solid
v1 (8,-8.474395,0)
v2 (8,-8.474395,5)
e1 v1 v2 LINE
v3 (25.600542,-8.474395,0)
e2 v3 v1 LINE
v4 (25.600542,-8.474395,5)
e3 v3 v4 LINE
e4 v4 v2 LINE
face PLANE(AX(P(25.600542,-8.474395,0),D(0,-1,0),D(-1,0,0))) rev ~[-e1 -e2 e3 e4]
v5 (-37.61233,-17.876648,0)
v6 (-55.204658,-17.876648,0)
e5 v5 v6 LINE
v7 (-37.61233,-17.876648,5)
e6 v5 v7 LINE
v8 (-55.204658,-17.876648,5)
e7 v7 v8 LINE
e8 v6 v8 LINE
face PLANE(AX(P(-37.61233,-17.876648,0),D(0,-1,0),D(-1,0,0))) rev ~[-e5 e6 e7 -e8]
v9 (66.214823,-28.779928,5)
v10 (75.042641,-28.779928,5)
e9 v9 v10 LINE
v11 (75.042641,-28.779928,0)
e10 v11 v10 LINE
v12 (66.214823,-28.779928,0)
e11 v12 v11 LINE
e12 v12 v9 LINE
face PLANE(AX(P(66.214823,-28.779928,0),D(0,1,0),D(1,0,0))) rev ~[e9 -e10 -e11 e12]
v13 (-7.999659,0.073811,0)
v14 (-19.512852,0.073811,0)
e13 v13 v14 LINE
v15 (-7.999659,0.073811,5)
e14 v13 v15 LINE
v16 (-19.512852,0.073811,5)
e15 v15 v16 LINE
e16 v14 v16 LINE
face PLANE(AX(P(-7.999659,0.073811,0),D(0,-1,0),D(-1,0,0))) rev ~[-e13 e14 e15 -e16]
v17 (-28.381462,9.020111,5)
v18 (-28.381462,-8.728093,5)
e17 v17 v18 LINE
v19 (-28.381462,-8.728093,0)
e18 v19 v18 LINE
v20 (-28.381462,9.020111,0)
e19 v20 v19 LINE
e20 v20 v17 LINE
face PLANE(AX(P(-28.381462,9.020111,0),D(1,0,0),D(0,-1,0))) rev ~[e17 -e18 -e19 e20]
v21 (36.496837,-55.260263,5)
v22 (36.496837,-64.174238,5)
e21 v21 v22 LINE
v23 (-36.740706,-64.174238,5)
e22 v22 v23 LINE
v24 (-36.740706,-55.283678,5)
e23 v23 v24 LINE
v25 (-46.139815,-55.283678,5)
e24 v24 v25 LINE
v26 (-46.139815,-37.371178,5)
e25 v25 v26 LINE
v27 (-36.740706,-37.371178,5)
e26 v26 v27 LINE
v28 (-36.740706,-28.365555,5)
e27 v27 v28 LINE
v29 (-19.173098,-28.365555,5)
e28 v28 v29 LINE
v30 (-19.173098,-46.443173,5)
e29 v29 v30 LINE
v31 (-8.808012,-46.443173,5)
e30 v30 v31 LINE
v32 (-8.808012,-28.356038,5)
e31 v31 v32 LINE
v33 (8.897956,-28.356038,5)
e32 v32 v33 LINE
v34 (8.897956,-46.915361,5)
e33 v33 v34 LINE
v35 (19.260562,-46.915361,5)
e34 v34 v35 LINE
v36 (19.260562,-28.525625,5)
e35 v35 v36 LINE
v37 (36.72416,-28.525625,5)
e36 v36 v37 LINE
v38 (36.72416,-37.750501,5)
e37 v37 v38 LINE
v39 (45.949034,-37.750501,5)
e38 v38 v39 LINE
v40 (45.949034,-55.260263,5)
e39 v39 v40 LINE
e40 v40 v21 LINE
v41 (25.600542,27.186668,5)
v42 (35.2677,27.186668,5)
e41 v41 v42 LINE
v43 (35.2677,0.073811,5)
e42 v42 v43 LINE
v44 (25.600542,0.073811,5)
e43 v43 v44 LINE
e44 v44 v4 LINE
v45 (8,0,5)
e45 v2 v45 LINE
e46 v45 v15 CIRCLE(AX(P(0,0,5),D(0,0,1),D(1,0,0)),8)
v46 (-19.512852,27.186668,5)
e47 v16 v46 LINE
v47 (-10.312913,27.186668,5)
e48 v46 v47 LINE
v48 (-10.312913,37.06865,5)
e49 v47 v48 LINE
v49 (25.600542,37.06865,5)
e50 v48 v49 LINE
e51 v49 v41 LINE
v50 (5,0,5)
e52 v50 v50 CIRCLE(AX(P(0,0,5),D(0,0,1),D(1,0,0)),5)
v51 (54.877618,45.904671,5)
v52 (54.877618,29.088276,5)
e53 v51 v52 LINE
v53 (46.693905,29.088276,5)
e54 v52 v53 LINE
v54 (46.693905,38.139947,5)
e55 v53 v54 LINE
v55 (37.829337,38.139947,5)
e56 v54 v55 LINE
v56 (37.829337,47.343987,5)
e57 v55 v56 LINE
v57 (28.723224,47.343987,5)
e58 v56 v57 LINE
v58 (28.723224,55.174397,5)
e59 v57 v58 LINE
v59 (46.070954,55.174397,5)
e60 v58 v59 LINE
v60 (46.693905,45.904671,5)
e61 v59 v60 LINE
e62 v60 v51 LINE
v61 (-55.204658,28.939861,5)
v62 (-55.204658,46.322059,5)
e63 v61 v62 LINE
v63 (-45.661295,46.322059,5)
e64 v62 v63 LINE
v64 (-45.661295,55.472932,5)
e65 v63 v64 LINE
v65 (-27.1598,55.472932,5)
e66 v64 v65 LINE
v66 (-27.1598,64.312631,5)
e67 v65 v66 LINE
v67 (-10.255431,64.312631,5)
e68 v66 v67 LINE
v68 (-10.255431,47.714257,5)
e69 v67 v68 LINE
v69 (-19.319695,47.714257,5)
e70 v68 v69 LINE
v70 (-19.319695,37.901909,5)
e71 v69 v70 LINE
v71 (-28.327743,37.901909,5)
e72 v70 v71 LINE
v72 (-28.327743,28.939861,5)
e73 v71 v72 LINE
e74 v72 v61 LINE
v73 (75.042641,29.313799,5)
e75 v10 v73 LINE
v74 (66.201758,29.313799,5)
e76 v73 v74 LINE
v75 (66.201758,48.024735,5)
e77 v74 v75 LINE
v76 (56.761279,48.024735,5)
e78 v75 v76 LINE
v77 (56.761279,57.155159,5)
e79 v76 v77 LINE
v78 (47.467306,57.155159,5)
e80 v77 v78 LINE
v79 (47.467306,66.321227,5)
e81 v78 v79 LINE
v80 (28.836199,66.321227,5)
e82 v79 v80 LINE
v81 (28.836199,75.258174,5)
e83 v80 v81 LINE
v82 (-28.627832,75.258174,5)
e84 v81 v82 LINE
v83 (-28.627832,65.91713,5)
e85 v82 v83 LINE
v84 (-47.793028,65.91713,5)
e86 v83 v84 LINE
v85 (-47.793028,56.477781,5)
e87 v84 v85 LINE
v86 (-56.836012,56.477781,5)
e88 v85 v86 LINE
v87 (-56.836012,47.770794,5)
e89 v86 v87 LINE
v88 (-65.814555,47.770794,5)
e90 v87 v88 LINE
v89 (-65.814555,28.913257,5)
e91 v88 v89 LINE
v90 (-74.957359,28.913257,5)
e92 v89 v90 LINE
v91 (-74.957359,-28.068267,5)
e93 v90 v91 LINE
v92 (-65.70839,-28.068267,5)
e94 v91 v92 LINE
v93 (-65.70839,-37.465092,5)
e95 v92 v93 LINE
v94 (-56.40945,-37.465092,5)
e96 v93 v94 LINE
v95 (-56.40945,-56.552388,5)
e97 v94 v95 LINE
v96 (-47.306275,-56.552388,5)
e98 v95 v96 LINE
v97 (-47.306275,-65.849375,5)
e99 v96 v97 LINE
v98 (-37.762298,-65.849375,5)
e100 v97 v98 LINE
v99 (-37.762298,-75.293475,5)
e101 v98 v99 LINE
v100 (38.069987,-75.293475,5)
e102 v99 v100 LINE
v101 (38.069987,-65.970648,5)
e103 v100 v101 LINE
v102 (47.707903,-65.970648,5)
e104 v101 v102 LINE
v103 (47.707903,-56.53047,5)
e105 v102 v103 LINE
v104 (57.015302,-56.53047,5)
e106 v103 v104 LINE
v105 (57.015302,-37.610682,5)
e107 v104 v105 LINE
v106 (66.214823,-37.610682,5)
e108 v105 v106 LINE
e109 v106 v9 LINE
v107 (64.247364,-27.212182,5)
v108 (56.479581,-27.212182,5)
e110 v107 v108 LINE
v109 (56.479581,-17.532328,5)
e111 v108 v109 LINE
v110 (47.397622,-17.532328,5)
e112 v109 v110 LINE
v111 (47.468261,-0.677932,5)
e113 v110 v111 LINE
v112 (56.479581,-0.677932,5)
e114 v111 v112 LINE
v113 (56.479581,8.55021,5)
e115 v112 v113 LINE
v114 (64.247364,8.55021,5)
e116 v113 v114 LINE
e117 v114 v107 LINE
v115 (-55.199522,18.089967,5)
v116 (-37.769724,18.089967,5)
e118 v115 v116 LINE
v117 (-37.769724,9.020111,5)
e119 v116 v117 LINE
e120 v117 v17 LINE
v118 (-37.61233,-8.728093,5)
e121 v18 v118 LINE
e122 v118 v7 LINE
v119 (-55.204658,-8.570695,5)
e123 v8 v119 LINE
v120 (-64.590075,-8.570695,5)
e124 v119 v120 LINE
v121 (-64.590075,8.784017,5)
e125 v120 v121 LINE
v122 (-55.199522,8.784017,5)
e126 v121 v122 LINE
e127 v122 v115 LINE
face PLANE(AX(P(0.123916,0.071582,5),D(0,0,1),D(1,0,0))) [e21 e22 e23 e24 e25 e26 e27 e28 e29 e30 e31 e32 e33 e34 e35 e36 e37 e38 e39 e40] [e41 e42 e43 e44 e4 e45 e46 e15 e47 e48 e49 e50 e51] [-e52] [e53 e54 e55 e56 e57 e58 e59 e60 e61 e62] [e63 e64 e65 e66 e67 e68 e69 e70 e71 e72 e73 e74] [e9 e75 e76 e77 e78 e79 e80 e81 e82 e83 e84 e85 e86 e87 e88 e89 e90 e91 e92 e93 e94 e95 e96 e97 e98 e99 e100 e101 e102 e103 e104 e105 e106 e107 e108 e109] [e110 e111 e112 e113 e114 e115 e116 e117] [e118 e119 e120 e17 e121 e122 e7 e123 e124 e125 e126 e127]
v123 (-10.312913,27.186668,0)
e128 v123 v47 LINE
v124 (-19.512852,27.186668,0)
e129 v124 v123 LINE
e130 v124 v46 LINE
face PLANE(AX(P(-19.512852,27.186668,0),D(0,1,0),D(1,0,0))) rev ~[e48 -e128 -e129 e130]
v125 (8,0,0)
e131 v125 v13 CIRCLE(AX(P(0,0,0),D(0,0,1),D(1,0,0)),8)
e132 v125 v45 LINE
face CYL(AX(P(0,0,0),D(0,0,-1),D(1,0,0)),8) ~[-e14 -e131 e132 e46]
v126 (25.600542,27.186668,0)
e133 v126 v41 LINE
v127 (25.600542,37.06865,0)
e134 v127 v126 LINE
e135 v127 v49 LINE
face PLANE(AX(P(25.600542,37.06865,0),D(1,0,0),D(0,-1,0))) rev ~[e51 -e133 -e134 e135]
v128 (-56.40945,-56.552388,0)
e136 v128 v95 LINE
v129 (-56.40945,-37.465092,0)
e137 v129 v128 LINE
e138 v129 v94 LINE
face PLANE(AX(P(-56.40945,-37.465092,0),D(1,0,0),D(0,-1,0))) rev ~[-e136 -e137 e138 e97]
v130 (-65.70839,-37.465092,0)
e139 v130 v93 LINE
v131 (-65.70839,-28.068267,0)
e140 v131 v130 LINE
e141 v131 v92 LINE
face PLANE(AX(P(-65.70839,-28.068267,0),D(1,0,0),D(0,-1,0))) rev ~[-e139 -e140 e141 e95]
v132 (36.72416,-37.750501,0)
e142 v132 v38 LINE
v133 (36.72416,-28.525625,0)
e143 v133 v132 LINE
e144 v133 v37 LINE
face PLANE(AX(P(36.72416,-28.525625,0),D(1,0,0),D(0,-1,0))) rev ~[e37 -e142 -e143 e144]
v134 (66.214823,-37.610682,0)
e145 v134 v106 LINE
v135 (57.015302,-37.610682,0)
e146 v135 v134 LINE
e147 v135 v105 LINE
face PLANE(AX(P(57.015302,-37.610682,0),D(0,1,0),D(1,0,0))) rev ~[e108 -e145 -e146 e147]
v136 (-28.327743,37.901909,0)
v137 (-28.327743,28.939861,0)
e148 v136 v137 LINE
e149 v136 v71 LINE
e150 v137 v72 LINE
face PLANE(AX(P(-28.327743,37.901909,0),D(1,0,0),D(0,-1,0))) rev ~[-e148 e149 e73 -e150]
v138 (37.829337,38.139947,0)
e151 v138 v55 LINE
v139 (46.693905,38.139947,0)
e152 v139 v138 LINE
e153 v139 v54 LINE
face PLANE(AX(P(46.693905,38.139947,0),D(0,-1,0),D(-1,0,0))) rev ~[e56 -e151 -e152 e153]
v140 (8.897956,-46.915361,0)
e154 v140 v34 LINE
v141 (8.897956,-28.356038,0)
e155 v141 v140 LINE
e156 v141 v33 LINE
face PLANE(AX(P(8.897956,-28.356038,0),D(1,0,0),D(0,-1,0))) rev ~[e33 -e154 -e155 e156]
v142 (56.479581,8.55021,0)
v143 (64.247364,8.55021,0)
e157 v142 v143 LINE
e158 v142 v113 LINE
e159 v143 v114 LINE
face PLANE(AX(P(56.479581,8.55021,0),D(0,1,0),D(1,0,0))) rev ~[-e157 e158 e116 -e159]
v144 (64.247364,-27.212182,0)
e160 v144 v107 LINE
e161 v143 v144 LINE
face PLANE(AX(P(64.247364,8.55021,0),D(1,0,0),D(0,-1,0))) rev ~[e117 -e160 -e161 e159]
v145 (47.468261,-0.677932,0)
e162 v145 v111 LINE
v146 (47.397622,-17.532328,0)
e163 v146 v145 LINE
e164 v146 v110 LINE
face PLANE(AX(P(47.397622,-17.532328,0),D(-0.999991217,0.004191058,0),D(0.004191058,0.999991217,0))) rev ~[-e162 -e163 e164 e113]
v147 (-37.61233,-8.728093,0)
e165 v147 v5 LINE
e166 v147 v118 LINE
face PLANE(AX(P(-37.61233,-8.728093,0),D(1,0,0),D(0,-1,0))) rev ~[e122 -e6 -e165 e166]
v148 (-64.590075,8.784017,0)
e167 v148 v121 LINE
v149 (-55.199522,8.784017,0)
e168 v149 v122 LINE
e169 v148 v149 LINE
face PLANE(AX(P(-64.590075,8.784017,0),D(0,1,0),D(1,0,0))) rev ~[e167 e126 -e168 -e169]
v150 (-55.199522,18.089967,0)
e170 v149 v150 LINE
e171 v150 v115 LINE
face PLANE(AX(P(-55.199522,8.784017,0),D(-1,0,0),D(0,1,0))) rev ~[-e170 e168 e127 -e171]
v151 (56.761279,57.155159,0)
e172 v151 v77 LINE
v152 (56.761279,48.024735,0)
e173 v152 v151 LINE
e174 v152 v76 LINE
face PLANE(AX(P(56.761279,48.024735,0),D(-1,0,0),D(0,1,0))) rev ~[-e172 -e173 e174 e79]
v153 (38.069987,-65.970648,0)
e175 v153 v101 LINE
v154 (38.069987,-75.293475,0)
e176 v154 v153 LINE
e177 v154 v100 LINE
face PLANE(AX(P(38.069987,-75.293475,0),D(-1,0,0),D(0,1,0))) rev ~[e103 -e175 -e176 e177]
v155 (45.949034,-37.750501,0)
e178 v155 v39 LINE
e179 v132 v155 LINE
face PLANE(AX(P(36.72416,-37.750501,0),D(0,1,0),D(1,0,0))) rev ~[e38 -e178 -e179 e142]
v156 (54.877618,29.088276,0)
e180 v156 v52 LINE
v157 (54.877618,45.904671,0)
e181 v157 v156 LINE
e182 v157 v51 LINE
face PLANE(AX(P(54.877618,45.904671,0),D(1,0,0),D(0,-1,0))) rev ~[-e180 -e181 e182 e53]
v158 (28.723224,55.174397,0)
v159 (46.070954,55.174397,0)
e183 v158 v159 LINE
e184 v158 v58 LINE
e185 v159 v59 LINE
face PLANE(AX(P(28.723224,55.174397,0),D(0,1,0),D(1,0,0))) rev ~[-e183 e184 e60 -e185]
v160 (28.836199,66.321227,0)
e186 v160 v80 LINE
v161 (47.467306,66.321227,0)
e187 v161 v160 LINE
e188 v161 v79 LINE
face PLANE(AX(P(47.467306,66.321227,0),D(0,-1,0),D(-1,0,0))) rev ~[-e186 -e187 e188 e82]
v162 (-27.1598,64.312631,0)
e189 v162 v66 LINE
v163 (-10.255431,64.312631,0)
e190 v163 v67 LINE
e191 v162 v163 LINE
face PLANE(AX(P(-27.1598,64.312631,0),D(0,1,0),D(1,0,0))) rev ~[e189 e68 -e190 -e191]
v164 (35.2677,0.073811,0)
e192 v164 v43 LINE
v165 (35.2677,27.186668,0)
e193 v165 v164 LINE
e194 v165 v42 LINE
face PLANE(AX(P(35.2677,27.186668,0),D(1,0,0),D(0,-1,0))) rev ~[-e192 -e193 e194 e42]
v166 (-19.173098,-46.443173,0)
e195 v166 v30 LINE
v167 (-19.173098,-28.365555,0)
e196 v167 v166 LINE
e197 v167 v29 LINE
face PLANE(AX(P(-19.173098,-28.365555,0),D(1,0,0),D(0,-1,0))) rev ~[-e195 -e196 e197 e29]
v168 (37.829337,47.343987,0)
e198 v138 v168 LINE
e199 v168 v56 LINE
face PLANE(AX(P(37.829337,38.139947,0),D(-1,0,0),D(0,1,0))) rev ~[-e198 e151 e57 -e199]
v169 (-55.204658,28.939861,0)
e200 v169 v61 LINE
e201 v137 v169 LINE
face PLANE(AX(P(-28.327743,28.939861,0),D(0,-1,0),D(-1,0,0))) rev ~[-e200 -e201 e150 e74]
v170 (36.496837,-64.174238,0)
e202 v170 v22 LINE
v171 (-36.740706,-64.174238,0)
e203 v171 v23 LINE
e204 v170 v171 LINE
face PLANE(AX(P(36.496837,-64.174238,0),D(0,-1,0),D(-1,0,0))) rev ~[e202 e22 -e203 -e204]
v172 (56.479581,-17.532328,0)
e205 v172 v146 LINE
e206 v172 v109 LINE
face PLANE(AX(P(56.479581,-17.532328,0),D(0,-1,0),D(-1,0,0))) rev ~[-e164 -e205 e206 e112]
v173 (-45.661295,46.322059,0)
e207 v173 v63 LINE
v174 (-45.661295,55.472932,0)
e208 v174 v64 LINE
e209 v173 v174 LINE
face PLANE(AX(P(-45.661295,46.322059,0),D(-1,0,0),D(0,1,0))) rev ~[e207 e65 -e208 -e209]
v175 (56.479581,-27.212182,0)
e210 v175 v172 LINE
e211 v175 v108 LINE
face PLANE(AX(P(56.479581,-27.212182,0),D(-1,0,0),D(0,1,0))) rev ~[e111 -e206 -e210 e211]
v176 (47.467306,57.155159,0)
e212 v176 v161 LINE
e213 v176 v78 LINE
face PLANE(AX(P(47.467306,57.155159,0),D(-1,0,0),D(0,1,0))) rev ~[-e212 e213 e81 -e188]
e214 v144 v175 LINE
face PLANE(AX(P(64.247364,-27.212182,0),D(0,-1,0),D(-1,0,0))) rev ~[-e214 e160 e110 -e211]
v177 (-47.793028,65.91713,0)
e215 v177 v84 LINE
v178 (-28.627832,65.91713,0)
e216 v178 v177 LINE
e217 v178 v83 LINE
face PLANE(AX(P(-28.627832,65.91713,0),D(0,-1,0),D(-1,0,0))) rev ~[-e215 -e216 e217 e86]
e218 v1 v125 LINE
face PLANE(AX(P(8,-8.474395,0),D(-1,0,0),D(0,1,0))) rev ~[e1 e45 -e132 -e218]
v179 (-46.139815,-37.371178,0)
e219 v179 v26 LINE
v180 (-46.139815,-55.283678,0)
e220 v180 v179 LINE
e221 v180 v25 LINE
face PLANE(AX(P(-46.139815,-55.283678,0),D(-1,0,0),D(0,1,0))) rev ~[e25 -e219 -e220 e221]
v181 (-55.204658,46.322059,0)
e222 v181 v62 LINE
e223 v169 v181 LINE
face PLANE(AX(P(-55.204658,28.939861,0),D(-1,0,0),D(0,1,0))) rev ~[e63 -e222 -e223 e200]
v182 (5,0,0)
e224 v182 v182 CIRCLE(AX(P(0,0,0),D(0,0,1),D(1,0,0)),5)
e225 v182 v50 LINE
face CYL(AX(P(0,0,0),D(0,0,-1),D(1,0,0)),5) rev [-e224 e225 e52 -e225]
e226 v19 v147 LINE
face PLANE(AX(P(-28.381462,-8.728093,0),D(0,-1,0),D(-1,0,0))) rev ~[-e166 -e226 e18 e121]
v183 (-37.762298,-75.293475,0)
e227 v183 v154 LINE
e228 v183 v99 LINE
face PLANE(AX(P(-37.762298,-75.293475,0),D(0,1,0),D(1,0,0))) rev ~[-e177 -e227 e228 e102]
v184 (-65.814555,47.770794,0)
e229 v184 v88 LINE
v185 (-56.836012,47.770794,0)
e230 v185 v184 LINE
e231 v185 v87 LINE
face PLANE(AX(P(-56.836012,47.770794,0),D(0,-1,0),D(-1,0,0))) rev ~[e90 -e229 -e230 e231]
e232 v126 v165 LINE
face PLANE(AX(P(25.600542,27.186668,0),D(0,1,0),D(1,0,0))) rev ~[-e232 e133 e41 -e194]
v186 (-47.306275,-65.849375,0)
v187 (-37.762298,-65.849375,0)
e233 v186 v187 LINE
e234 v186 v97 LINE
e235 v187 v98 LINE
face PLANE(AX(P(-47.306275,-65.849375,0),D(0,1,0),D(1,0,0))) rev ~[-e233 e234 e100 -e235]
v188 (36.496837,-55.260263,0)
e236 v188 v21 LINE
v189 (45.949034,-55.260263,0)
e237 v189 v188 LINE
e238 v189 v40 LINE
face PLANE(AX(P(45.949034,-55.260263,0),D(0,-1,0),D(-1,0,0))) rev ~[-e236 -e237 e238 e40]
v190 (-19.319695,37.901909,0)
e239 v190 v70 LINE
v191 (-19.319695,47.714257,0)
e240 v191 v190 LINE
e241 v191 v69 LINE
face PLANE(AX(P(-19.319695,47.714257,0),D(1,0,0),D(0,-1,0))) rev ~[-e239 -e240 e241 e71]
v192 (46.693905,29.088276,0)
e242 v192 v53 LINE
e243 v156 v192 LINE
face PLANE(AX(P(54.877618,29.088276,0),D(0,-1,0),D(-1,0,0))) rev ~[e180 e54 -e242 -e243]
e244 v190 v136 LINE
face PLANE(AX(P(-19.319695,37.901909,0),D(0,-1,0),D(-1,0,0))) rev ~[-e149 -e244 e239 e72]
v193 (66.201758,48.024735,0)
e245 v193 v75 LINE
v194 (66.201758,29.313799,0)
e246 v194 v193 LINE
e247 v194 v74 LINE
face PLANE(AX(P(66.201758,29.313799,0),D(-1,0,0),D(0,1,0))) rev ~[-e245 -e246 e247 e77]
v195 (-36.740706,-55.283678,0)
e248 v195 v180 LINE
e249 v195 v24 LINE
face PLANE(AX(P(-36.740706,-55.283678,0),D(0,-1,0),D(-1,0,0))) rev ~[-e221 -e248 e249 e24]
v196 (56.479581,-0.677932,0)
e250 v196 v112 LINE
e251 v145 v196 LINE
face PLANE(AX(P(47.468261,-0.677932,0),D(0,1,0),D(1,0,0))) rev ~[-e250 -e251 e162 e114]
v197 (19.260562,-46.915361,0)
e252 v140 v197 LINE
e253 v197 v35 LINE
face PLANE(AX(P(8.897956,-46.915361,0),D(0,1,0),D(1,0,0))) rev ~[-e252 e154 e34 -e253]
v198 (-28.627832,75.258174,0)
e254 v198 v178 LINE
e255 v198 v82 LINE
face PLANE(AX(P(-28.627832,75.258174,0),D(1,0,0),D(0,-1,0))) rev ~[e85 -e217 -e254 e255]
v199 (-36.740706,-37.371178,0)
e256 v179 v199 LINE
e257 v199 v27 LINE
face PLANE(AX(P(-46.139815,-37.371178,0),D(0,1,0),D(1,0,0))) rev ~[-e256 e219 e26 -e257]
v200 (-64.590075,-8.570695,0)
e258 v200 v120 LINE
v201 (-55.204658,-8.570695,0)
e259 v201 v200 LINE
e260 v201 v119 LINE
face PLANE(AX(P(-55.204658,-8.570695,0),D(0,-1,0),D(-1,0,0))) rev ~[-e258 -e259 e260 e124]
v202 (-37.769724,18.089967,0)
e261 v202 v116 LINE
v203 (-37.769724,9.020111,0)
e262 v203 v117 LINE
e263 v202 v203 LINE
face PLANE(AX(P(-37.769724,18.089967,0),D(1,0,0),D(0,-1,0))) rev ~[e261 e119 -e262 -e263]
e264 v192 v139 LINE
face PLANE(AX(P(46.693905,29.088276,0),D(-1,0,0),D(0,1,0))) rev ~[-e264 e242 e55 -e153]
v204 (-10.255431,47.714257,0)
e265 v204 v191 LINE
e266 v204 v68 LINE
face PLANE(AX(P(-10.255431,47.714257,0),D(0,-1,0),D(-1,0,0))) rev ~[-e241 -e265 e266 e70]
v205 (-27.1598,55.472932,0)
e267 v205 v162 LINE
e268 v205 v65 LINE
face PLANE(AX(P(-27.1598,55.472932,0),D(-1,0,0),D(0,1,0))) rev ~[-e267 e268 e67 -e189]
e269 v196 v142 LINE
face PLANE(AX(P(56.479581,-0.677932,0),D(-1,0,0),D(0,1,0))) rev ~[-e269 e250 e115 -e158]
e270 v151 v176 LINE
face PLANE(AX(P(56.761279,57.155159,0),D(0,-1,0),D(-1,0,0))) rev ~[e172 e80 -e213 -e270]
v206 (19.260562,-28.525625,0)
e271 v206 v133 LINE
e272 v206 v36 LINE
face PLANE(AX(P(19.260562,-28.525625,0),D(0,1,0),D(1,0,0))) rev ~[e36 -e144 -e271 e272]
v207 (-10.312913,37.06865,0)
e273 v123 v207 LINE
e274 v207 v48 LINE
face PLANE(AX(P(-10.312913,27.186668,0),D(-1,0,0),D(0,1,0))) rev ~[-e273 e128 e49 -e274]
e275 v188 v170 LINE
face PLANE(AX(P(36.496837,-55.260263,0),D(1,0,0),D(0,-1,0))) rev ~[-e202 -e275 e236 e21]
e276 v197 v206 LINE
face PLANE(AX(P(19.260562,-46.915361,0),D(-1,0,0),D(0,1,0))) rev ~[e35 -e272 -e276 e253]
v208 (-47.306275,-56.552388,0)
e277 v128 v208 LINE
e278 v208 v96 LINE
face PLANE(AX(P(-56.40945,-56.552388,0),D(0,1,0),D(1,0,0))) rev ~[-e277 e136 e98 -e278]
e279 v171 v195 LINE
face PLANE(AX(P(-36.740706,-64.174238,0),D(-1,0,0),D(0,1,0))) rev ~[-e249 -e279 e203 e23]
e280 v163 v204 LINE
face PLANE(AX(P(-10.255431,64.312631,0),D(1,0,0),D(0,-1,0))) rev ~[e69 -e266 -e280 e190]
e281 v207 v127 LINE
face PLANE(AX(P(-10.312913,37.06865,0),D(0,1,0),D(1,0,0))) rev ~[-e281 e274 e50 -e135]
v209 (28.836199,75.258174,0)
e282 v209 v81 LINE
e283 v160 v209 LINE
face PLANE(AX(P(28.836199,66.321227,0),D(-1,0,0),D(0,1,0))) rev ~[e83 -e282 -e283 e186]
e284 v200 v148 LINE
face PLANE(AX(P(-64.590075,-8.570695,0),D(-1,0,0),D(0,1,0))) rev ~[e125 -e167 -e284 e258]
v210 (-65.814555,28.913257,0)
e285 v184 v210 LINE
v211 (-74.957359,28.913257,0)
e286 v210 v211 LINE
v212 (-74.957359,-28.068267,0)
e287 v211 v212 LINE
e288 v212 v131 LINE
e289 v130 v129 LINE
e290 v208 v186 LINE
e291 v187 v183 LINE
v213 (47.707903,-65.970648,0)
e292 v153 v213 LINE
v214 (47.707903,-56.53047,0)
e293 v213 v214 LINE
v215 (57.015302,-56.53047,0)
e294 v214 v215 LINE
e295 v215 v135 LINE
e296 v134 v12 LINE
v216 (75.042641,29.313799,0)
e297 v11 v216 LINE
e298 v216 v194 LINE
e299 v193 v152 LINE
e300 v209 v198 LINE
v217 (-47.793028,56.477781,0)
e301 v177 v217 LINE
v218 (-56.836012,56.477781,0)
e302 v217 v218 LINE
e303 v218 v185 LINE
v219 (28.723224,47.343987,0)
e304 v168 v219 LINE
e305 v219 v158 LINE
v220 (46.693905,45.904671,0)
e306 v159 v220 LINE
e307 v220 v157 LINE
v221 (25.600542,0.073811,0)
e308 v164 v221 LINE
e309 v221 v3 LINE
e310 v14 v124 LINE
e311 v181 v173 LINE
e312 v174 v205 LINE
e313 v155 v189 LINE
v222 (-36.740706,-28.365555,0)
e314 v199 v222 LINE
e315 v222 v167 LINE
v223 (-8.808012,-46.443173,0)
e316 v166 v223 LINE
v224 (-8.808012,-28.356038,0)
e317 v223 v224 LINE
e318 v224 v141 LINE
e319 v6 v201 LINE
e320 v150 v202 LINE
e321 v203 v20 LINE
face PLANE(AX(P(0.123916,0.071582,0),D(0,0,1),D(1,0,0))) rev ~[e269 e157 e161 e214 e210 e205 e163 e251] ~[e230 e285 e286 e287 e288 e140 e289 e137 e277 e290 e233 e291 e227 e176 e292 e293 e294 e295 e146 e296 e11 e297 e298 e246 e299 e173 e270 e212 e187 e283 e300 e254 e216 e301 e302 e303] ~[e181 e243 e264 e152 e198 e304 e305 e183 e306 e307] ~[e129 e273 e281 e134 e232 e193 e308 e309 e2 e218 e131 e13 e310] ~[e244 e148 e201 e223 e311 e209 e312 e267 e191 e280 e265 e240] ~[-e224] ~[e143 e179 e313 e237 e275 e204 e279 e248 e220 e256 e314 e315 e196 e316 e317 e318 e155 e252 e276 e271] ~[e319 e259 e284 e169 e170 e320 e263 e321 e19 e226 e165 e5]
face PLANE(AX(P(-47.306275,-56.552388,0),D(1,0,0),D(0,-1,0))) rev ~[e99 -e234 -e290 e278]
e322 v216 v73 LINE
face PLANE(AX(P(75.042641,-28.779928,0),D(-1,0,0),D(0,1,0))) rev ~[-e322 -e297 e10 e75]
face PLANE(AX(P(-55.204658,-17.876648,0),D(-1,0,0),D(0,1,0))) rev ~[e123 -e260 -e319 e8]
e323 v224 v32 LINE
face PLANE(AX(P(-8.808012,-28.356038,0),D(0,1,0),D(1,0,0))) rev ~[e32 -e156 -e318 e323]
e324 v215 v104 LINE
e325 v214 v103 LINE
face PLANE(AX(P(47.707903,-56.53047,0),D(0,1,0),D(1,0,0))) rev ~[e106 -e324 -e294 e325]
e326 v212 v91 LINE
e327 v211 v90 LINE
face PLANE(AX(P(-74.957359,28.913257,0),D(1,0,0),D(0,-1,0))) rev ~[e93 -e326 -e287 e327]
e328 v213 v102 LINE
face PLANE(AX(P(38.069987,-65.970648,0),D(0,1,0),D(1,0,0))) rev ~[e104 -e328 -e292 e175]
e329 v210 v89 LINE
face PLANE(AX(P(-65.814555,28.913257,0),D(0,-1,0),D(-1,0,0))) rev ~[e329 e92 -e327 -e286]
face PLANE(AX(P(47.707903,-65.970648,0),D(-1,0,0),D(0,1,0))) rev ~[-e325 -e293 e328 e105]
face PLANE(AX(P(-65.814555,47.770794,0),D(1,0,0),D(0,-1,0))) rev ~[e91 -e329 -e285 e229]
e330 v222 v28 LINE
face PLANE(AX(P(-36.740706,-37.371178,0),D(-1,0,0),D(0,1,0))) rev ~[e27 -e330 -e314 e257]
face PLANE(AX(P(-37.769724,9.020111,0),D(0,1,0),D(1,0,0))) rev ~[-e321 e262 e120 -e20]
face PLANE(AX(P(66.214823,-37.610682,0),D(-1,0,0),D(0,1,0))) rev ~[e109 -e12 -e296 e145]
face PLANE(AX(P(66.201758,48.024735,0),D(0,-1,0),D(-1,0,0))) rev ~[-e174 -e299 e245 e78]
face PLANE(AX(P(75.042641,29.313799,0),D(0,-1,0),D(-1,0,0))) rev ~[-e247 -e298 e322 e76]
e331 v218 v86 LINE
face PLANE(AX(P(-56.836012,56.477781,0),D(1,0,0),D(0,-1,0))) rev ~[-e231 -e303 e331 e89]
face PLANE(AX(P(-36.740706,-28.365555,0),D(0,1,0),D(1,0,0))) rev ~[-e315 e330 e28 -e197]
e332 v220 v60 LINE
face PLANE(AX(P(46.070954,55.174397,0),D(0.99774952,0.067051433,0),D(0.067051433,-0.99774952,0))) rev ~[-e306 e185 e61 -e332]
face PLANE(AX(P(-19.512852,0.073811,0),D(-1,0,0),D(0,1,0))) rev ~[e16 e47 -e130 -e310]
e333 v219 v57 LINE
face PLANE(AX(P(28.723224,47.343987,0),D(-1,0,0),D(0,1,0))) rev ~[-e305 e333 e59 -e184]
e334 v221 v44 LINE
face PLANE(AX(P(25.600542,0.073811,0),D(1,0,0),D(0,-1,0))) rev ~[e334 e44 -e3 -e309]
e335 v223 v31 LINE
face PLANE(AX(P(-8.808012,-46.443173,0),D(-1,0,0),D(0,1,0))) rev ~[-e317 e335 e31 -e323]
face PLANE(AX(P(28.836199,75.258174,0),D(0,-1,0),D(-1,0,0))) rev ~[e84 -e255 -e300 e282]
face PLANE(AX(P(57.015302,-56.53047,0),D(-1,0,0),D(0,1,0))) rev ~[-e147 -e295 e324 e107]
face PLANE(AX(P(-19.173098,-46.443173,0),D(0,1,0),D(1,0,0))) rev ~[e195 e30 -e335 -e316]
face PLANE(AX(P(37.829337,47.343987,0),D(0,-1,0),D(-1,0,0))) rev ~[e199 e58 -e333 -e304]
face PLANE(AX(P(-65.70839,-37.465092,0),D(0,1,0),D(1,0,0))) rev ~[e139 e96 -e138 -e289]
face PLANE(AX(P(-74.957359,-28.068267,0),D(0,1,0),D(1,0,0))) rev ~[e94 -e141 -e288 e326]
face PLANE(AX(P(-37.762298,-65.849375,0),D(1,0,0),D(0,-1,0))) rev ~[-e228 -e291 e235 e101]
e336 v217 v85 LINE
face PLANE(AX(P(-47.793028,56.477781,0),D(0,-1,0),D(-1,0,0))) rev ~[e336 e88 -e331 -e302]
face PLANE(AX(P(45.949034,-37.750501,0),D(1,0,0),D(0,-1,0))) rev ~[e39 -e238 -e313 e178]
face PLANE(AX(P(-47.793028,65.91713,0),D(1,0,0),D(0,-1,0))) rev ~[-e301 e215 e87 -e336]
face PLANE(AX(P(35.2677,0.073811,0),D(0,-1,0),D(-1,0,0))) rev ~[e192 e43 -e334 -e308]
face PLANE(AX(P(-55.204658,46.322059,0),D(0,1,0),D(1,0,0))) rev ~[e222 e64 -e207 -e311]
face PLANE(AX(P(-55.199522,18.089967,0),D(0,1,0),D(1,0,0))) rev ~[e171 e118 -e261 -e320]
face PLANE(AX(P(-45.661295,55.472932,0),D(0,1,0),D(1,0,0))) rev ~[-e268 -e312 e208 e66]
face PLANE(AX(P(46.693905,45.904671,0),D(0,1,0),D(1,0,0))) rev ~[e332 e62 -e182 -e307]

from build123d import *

# Parameters (mm, degrees)
F0_R     = 5
F1_DEPTH = 5


# Not quite as in the source:
# - a feature names something its author has since deleted; it is built from what else it names


with BuildPart() as f1:
    # F0 (on Top) → F1 (new body)
    with BuildSketch(Plane.XY):
        Polygon((28.8361990176, 66.3212267974), (28.8361990176, 75.2581738144), (-28.6278320871, 75.2581738144), (-28.6278320871, 65.9171296439), (-47.7930275365, 65.9171296439), (-47.7930275365, 56.4777807232), (-56.8360119664, 56.4777807232), (-56.8360119664, 47.77079441), (-65.8145548105, 47.77079441), (-65.8145548105, 28.9132569506), (-74.9573593959, 28.9132569506), (-74.9573593959, -28.0682670643), (-65.7083904313, -28.0682670643), (-65.7083904313, -37.4650924841), (-56.4094499535, -37.4650924841), (-56.4094499535, -56.5523879105), (-47.3062752641, -56.5523879105), (-47.3062752641, -65.8493747442), (-37.7622978478, -65.8493747442), (-37.7622978478, -75.2934746653), (38.0699873075, -75.2934746653), (38.0699873075, -65.9706481237), (47.7079034685, -65.9706481237), (47.7079034685, -56.5304698258), (57.015301546, -56.5304698258), (57.015301546, -37.6106819749), (66.2148232459, -37.6106819749), (66.2148232459, -28.7799280069), (75.0426406041, -28.7799280069), (75.0426406041, 29.3137990452), (66.2017579949, 29.3137990452), (66.2017579949, 48.0247353784), (56.7612786638, 48.0247353784), (56.7612786638, 57.1551586931), (47.4673062579, 57.1551586931), (47.4673062579, 66.3212267974), align=None)
        Polygon((19.260561918, -28.5256245699), (36.7241599718, -28.5256245699), (36.7241599718, -37.7505006385), (45.9490339925, -37.7505006385), (45.9490339925, -55.2602632616), (36.4968368924, -55.2602632616), (36.4968368924, -64.1742375536), (-36.7407058072, -64.1742375536), (-36.7407058072, -55.283678321), (-46.1398145742, -55.283678321), (-46.1398145742, -37.3711783135), (-36.7407058072, -37.3711783135), (-36.7407058072, -28.3655547674), (-19.1730977071, -28.3655547674), (-19.1730977071, -46.4431725153), (-8.8080122735, -46.4431725153), (-8.8080122735, -28.3560384318), (8.8979564246, -28.3560384318), (8.8979564246, -46.9153605143), (19.260561918, -46.9153605143), align=None, mode=Mode.SUBTRACT)
        Polygon((56.4795812045, 8.5502099078), (64.2473643763, 8.5502099078), (64.2473643763, -27.2121818547), (56.4795812045, -27.2121818547), (56.4795812045, -17.5323278765), (47.397622189, -17.5323278765), (47.4682605536, -0.6779317695), (56.4795812045, -0.6779317695), align=None, mode=Mode.SUBTRACT)
        Polygon((-37.7697237636, 9.0201110426), (-28.3814624315, 9.0201110426), (-28.3814624315, -8.7280929223), (-37.6123304944, -8.7280929223), (-37.6123304944, -17.8766478564), (-55.2046581313, -17.8766478564), (-55.2046581313, -8.5706945335), (-64.5900750067, -8.5706945335), (-64.5900750067, 8.7840165312), (-55.1995221361, 8.7840165312), (-55.1995221361, 18.0899667823), (-37.7697237636, 18.0899667823), align=None, mode=Mode.SUBTRACT)
        Polygon((-27.1597996025, 64.3126308179), (-10.2554311506, 64.3126308179), (-10.2554311506, 47.7142569757), (-19.3196951095, 47.7142569757), (-19.3196951095, 37.9019094753), (-28.3277433041, 37.9019094753), (-28.3277433041, 28.9398610834), (-55.2046581313, 28.9398610834), (-55.2046581313, 46.3220587686), (-45.6612946386, 46.3220587686), (-45.6612946386, 55.4729318632), (-27.1597996025, 55.4729318632), align=None, mode=Mode.SUBTRACT)
        Polygon((25.6005422263, 27.1866678011), (35.2676995658, 27.1866678011), (35.2676995658, 0.073810573), (25.6005422263, 0.073810573), (25.6005422263, -8.4743950561), (8, -8.4743950561), (-10.3129134285, -8.4743950561), (-10.3129134285, 0.073810573), (-19.5128518648, 0.073810573), (-19.5128518648, 27.1866678011), (-10.3129134285, 27.1866678011), (-10.3129134285, 37.0686502221), (25.6005422263, 37.0686502221), align=None, mode=Mode.SUBTRACT)
        Polygon((28.7232235059, 47.3439866557), (28.7232235059, 55.1743970225), (46.070954491, 55.1743970225), (46.6939048371, 45.9046711012), (54.8776176106, 45.9046711012), (54.8776176106, 29.0882760215), (46.6939048371, 29.0882760215), (46.6939048371, 38.1399474098), (37.8293368529, 38.1399474098), (37.8293368529, 47.3439866557), align=None, mode=Mode.SUBTRACT)
        with BuildLine():
            ThreePointArc((-7.9996594927, 0.073810573), (-0.0369056792, -7.9999148727), (8, 0))
            ThreePointArc((8, 0), (0.0369056792, 7.9999148727), (-7.9996594927, 0.073810573))
        make_face()
        Circle(F0_R, mode=Mode.SUBTRACT)
        with BuildLine():
            Line((-10.3129134285, -8.4743950561), (8, -8.4743950561))
            Line((8, -8.4743950561), (8, 0))
            ThreePointArc((8, 0), (-0.0369056792, -7.9999148727), (-7.9996594927, 0.073810573))
            Line((-7.9996594927, 0.073810573), (-10.3129134285, 0.073810573))
            Line((-10.3129134285, 0.073810573), (-10.3129134285, -8.4743950561))
        make_face()
    extrude(amount=F1_DEPTH)


solid = f1.part
